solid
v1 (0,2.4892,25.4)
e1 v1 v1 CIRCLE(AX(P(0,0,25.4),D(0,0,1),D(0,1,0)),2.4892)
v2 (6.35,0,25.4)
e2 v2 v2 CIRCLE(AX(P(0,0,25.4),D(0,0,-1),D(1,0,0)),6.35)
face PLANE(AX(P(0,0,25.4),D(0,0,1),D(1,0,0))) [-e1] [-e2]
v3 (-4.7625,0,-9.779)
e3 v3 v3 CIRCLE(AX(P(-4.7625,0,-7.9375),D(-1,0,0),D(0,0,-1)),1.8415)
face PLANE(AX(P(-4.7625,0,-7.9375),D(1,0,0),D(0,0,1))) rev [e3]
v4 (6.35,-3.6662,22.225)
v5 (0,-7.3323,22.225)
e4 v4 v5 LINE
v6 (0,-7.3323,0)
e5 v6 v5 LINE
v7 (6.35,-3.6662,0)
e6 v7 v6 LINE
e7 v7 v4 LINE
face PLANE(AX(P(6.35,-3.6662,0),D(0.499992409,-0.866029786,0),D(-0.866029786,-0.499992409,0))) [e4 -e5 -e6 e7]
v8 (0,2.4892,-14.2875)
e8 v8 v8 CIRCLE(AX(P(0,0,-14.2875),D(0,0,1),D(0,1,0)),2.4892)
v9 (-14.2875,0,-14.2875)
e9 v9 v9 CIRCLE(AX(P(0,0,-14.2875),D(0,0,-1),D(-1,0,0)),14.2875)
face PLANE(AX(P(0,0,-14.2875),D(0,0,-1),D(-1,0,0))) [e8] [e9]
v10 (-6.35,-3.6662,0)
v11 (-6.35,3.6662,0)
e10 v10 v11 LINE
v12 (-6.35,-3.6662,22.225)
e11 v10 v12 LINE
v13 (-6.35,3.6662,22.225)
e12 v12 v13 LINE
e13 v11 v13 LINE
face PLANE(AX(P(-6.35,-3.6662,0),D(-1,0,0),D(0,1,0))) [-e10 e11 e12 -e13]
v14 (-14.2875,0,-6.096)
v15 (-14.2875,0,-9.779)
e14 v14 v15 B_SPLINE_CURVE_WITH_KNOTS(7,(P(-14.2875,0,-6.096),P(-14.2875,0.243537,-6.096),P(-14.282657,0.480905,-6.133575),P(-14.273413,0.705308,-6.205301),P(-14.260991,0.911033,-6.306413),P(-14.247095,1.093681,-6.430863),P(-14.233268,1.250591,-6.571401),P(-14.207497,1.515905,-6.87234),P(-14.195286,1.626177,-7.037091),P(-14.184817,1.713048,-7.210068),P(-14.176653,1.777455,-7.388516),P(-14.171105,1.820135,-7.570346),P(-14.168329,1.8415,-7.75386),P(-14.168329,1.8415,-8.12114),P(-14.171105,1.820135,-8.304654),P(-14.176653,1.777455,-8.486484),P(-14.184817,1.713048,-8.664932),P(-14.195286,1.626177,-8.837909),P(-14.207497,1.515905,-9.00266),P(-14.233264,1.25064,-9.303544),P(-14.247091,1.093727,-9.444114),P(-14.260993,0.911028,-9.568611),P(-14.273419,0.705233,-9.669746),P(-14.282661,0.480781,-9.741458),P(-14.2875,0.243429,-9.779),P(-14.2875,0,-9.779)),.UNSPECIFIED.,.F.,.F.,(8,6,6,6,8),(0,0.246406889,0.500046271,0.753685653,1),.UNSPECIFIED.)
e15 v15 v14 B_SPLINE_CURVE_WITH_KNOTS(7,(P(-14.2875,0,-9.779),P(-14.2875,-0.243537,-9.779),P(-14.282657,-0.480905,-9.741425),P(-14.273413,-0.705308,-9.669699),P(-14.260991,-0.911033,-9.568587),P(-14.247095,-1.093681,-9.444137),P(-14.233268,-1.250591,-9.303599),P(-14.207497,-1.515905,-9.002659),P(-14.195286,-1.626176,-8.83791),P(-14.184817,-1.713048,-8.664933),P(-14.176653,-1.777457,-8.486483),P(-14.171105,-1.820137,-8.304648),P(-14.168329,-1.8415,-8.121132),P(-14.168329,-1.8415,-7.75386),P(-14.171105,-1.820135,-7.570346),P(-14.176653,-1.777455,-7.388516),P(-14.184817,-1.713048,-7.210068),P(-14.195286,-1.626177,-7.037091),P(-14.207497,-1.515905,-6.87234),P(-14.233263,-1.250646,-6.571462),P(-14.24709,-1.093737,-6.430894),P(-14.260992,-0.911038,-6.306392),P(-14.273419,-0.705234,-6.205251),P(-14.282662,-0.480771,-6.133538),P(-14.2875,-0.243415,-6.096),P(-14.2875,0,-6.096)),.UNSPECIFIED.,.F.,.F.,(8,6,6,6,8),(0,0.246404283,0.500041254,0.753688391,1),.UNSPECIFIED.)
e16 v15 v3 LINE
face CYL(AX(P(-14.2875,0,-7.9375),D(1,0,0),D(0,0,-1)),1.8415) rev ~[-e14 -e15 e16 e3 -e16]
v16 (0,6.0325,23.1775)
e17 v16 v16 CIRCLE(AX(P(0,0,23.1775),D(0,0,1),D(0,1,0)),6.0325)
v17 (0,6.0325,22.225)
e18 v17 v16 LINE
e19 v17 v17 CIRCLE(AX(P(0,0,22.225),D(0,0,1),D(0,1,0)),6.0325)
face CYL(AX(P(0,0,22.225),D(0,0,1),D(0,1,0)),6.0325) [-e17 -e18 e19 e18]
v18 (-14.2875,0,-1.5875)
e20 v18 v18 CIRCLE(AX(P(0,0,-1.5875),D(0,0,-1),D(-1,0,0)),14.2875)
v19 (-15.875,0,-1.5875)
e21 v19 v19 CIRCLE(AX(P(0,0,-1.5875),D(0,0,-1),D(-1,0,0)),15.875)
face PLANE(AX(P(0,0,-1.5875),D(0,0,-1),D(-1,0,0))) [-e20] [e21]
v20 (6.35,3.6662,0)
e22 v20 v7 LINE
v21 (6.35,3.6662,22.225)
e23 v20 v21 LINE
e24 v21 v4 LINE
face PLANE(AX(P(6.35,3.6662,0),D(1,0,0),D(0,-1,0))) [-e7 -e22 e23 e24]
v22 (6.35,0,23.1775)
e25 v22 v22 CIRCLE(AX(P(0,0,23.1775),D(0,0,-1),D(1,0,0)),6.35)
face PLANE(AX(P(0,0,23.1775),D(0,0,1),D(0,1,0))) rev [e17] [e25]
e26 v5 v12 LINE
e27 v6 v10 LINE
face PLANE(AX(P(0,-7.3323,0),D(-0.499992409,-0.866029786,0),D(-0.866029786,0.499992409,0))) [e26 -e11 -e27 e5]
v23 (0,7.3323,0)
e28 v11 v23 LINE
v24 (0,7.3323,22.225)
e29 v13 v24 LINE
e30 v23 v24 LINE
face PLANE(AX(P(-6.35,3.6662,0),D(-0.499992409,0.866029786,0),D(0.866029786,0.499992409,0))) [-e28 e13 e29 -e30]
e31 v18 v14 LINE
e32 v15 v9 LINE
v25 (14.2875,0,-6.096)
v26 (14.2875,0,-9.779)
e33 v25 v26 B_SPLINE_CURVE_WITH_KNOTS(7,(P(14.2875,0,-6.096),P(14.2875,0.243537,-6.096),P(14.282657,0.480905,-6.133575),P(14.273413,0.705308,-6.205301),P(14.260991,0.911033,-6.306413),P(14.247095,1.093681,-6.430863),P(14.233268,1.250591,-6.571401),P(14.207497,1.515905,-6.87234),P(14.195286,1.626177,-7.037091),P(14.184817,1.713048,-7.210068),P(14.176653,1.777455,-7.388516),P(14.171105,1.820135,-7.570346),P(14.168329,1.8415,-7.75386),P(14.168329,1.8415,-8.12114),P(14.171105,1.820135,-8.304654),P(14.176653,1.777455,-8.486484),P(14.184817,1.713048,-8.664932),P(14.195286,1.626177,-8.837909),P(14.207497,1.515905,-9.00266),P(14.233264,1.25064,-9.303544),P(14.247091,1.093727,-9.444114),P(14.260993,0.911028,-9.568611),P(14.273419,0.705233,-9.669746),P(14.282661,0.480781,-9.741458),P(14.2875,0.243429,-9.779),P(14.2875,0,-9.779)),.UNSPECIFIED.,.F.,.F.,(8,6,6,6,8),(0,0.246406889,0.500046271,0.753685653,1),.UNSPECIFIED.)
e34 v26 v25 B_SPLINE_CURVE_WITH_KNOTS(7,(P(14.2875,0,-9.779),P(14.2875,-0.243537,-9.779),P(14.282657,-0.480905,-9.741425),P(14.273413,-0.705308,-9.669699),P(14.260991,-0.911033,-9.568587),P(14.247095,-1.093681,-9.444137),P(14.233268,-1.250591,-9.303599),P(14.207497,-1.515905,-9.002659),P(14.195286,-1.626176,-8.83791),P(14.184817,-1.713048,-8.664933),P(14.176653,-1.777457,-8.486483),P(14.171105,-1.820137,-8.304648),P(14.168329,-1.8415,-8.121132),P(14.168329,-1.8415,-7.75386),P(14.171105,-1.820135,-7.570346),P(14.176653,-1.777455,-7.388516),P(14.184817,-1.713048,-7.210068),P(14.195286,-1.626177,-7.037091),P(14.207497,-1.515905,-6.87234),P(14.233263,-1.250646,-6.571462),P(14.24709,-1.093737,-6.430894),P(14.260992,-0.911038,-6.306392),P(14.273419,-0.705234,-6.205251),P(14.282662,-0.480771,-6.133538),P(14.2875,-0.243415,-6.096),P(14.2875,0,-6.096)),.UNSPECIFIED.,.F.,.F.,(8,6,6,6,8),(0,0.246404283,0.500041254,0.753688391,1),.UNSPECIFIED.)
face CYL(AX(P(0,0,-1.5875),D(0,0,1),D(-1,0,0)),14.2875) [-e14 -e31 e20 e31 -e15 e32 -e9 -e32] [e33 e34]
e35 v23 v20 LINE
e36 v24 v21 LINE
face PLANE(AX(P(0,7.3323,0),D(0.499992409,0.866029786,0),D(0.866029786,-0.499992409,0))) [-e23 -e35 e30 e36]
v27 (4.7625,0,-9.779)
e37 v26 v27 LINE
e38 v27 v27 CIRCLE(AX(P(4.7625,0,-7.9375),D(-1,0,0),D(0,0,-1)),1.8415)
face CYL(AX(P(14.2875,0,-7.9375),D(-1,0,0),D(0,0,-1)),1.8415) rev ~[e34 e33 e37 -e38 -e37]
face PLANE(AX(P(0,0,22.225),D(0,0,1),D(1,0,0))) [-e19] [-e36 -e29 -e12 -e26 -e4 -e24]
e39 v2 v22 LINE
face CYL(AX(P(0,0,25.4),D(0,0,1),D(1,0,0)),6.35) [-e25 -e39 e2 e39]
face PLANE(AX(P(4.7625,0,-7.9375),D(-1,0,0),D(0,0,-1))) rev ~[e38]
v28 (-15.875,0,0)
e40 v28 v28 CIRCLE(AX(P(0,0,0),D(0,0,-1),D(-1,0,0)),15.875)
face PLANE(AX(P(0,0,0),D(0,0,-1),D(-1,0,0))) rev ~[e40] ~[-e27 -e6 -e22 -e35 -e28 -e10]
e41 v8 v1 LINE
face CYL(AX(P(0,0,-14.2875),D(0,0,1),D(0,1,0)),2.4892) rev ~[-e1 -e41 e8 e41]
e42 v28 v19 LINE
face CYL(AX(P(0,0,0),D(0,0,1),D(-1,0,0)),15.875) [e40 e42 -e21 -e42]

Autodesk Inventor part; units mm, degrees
ref_plane "YZ Plane" through (0, 0, 0) normal (1, 0, 0) x (0, 1, 0)
ref_plane "XZ Plane" through (0, 0, 0) normal (0, 1, 0) x (-1, 0, 0)
sketch "Sketch1" plane through (0, 0, 0) normal (0, 0, 1) x (1, 0, 0)
  line L0 (0, 7.3323) -> (6.35, 3.6662)
  line L1 (6.35, 3.6662) -> (6.35, -3.6662)
  line L2 (6.35, -3.6662) -> (0, -7.3323)
  line L3 (0, -7.3323) -> (-6.35, -3.6662)
  line L4 (-6.35, -3.6662) -> (-6.35, 3.6662)
  line L5 (-6.35, 3.6662) -> (0, 7.3323)
  point P0 (0, 0)
  point P1 (0, 0)
  dimension "d0" = 12.7
extrude "Extrusion1" add sketch "Sketch1" along normal blind 25.4
sketch "Sketch2" plane through (0, 0, 0) normal (0, 0, -1) x (-1, 0, 0)
  circle A0 centre (0, 0) radius 15.875
  dimension "d3" = 31.75
extrude "Extrusion2" add sketch "Sketch2" along normal blind 1.5875
sketch "Sketch3" plane through (0, 0, -1.5875) normal (0, 0, -1) x (-1, 0, 0)
  circle A0 centre (0, 0) radius 14.2875
  dimension "d6" = 28.575
extrude "Extrusion3" add sketch "Sketch3" along normal blind 12.7
sketch "Sketch4" plane through (0, 0, -14.2875) normal (0, 0, -1) x (-1, 0, 0)
  circle A0 centre (0, 0) radius 14.2875 construction
hole "Hole1" at (0, 0, -14.2875) direction (0, 0, 1) diameter 4.9784 end through all thread size "1/4-20 UNC" class "2B" standard "ANSI Unified Screw Threads"
ref_plane "Work Plane1" through (14.2875, 0, -1.5875) normal (1, 0, 0) x (0, 1, 0)
sketch "Sketch5" plane through (14.2875, 0, -1.5875) normal (1, 0, 0) x (0, 1, 0)
  line L0 (-14.2875, -12.7) -> (14.2875, -12.7) construction
  line L1 (14.2875, 0) -> (-14.2875, 0) construction
  line L2 (14.2875, 0) -> (14.2875, -12.7) construction
  line L3 (14.2875, 0) -> (14.2875, -12.7) construction
  point P0 (0, 1.5875)
  point P1 (0, -6.35)
  point P2 (14.2875, -6.35)
hole "Hole2" at (14.2875, 0, -7.9375) direction (-1, 0, 0) diameter 3.683 depth 9.525 thread size "10-24 UNC" class "2B" standard "ANSI Unified Screw Threads"
mirror "Mirror1" about plane through (0, 0, 0) normal (1, 0, 0) of "Hole2"
sketch "Sketch6" plane through (0, 0, 25.4) normal (0, 0, 1) x (1, 0, 0)
  circle A0 centre (0, 0) radius 6.35
  circle A1 centre (0, 0) radius 15.875 construction
  line L0 (6.35, 3.6662) -> (6.35, -3.6662) construction
  line L1 (6.35, -3.6662) -> (0, -7.3323) construction
  line L2 (0, -7.3323) -> (-6.35, -3.6662) construction
  line L3 (-6.35, -3.6662) -> (-6.35, 3.6662) construction
  line L4 (-6.35, 3.6662) -> (0, 7.3323) construction
  line L5 (0, 7.3323) -> (6.35, 3.6662) construction
  line L6 (0, 7.3323) -> (6.35, 3.6662)
  line L7 (6.35, 3.6662) -> (6.35, -3.6662)
  line L8 (6.35, -3.6662) -> (0, -7.3323)
  line L9 (0, -7.3323) -> (-6.35, -3.6662)
  line L10 (-6.35, -3.6662) -> (-6.35, 3.6662)
  line L11 (-6.35, 3.6662) -> (0, 7.3323)
extrude "Extrusion4" cut sketch "Sketch6" against normal blind 3.175 contours L7 L8 A0 | A0 L6 L7 | A0 L11 L6 | L8 L9 A0 | A0 L10 L11 | L9 L10 A0
sketch "Sketch7" plane through (0, 0, 0) normal (1, 0, 0) x (0, 1, 0)
  line L0 (14.2875, -1.5875) -> (14.2875, -14.2875) construction
  line L1 (14.2875, -14.2875) -> (2.4892, -14.2875) construction
  line L2 (2.4892, -14.2875) -> (2.4892, 25.4) construction
  line L3 (2.4892, 25.4) -> (6.35, 25.4) construction
  line L4 (6.35, 25.4) -> (6.35, 22.225) construction
  line L5 (6.35, 22.225) -> (7.3323, 22.225) construction
  line L6 (7.3323, 22.225) -> (7.3323, 0) construction
  line L7 (7.3323, 0) -> (15.875, 0) construction
  line L8 (15.875, 0) -> (15.875, -1.5875) construction
  line L9 (15.875, -1.5875) -> (14.2875, -1.5875) construction
  line L10 (-15.875, 0) -> (-7.3323, 0) construction
  line L11 (-7.3323, 0) -> (-7.3323, 22.225) construction
  line L12 (-7.3323, 22.225) -> (-6.35, 22.225) construction
  line L13 (-6.35, 22.225) -> (-6.35, 25.4) construction
  line L14 (-6.35, 25.4) -> (-2.4892, 25.4) construction
  line L15 (-2.4892, 25.4) -> (-2.4892, -14.2875) construction
  line L16 (-2.4892, -14.2875) -> (-14.2875, -14.2875) construction
  line L17 (-14.2875, -14.2875) -> (-14.2875, -1.5875) construction
  line L18 (-14.2875, -1.5875) -> (-15.875, -1.5875) construction
  line L19 (-15.875, -1.5875) -> (-15.875, 0) construction
  line L20 (6.35, 22.225) -> (6.0325, 22.225)
  line L21 (6.0325, 22.225) -> (6.0325, 23.1775)
  line L22 (6.0325, 23.1775) -> (6.35, 23.1775)
  line L23 (6.35, 23.1775) -> (6.35, 22.225)
  line L24 (0, -22.225) -> (0, 33.3375) projected
  point P0 (0, 0)
  dimension "d25" = 0.3175
  dimension "d26" = 0.9525
revolve "Revolution1" cut sketch "Sketch7" angle 360 about axis through (0, 0, -10) along (0, 0, 1)
sketch "Sketch8" plane through (0, 0, 25.4) normal (0, 0, 1) x (1, 0, 0)
  circle A0 centre (0, 0) radius 6.35 projected
  circle A1 centre (0, 0) radius 2.4892 projected
  circle A2 centre (0, 0) radius 15.875 projected
  line L0 (6.35, 3.6662) -> (6.35, -3.6662) projected
  line L1 (6.35, -3.6662) -> (0, -7.3323) projected
  line L2 (0, -7.3323) -> (-6.35, -3.6662) projected
  line L3 (-6.35, -3.6662) -> (-6.35, 3.6662) projected
  line L4 (-6.35, 3.6662) -> (0, 7.3323) projected
  line L5 (0, 7.3323) -> (6.35, 3.6662) projected
extrude "Extrusion5" [suppressed]
properties part number "WCP-0102" material "Aluminum 6061"
